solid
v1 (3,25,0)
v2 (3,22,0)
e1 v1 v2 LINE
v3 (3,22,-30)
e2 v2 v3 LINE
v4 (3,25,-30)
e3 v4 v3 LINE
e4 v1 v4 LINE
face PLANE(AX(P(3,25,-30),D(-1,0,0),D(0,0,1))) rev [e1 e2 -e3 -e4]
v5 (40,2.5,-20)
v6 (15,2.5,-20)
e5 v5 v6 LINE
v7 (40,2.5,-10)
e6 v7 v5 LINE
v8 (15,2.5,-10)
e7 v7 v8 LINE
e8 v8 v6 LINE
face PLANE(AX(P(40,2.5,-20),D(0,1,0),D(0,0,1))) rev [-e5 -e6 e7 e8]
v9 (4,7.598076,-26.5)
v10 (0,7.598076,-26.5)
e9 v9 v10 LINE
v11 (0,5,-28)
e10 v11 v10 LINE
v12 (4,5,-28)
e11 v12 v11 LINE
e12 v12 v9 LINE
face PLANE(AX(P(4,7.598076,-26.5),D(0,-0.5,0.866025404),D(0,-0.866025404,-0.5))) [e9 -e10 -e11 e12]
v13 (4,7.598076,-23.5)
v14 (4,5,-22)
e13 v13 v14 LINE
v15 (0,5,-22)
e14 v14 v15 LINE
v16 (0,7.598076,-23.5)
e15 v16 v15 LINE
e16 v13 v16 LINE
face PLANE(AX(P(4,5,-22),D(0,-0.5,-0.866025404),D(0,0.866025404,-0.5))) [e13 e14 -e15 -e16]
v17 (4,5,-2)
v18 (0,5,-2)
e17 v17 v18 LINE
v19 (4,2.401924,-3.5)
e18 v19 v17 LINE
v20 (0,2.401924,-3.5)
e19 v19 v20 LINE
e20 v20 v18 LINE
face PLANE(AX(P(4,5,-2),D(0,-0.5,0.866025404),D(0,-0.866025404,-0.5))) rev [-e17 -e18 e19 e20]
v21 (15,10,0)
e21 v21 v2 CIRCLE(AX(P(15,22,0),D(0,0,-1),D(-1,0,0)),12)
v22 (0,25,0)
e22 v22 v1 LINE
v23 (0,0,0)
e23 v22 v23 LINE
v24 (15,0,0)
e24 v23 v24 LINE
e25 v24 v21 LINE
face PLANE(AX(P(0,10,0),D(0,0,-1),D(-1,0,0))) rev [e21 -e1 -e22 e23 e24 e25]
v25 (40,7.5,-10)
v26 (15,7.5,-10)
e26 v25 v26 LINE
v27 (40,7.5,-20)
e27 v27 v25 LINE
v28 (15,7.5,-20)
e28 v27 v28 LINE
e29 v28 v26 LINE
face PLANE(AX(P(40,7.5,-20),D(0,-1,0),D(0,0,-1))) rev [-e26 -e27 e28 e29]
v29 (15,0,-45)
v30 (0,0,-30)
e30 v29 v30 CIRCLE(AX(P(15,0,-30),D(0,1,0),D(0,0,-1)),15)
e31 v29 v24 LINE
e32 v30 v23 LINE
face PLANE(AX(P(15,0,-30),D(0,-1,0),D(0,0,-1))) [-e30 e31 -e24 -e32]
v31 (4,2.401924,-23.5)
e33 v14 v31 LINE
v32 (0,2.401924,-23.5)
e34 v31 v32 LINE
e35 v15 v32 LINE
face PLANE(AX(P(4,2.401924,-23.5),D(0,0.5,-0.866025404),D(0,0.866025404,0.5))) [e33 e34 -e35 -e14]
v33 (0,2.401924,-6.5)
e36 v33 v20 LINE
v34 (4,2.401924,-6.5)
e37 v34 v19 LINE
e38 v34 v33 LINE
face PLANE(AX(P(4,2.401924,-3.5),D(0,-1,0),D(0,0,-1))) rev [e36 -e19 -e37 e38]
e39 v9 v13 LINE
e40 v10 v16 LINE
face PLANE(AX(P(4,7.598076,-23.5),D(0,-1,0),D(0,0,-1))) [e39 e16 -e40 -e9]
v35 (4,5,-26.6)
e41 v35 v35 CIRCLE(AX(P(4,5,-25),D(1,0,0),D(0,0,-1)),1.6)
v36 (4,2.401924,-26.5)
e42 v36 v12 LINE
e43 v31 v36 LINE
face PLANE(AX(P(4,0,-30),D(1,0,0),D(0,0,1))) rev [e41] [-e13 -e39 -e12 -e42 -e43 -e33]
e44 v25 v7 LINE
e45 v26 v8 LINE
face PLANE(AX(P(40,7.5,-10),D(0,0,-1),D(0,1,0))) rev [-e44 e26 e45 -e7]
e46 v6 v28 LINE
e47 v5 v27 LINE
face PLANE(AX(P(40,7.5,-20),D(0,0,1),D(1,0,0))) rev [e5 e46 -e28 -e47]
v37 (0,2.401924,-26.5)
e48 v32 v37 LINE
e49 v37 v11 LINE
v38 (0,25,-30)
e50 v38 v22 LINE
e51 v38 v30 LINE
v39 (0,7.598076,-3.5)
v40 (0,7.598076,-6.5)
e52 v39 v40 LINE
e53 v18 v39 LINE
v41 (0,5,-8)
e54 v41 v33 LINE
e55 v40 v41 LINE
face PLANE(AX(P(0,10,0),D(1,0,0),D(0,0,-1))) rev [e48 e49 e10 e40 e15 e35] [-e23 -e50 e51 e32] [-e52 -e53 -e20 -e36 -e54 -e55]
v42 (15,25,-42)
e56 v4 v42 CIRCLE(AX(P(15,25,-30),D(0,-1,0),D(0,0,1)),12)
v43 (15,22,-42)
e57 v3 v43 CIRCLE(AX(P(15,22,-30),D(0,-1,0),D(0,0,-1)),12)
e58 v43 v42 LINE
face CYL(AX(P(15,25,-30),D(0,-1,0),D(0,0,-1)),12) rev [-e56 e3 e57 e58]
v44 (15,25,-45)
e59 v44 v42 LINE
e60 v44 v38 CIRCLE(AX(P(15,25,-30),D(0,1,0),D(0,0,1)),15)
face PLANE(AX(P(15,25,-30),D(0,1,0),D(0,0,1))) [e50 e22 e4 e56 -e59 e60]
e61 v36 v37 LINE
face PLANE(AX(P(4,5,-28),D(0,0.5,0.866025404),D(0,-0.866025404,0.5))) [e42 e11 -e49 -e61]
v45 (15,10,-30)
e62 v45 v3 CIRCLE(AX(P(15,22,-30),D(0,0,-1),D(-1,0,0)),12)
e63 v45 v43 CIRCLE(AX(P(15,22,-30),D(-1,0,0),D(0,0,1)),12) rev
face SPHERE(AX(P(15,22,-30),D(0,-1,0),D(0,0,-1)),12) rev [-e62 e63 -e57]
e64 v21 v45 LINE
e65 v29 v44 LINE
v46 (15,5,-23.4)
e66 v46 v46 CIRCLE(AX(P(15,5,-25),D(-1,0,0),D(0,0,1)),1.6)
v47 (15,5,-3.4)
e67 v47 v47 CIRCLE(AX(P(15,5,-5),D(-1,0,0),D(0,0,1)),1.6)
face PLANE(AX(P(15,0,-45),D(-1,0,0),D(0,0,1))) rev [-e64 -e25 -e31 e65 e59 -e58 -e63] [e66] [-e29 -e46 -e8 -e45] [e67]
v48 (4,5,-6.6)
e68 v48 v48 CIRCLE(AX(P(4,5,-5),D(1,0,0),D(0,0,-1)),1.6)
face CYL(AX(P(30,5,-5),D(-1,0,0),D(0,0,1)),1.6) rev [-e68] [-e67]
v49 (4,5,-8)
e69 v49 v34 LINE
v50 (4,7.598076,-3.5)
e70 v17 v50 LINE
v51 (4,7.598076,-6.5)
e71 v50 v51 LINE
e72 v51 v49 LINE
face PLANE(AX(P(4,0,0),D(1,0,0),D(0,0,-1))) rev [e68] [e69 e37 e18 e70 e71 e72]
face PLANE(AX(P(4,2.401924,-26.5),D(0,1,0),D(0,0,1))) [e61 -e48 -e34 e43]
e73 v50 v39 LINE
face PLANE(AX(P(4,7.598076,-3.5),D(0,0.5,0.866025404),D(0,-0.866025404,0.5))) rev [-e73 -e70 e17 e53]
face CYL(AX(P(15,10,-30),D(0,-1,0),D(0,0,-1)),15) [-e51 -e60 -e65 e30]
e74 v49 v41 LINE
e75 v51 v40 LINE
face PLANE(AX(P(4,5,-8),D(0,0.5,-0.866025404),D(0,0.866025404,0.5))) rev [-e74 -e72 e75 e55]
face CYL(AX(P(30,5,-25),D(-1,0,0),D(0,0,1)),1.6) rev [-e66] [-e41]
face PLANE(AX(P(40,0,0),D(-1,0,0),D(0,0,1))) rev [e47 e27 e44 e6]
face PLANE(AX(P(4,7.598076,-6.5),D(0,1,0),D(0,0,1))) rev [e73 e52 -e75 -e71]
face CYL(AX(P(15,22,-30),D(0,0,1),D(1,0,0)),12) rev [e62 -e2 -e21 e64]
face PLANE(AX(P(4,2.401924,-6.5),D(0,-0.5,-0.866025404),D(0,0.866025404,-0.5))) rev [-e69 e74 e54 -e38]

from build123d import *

# Parameters (mm, degrees)
BOSS_EXTRUDE1_DEPTH = 10
BOSS_EXTRUDE2_DEPTH = 15
SKETCH8_R           = 1.6
CUT_EXTRUDE5_DEPTH  = 60.581876439
FILLET1_R           = 12
SKETCH4_W           = 15
SKETCH4_H           = 45
CUT_EXTRUDE2_DEPTH  = 60.581876439
SKETCH6_W           = 10
SKETCH6_H           = 5
BOSS_EXTRUDE3_DEPTH = 25
CUT_EXTRUDE6_DEPTH  = 4


with BuildPart() as part:
    # Sketch1 → Boss-Extrude1 (new body)
    with BuildSketch(Plane(origin=(0, 0, 0), x_dir=(1, 0, 0), z_dir=(0, 1, 0))):
        with BuildLine():
            Line((0, 0), (30, 0))
            Line((30, 0), (30, 30))
            ThreePointArc((30, 30), (15, 45), (0, 30))
            Line((0, 30), (0, 0))
        make_face()
    extrude(amount=BOSS_EXTRUDE1_DEPTH)

    # Sketch2 → Boss-Extrude2 (add)
    with BuildSketch(Plane(origin=(0, 10, 0), x_dir=(1, 0, 0), z_dir=(0, 1, 0))):
        with BuildLine():
            Line((3, 30), (3, 3))
            Line((3, 3), (3, 0))
            Line((3, 0), (0, 0))
            Line((0, 0), (0, 30))
            ThreePointArc((0, 30), (15, 45), (30, 30))
            Line((30, 30), (30, 0))
            Line((30, 0), (27, 0))
            Line((27, 0), (27, 3))
            Line((27, 3), (27, 30))
            ThreePointArc((27, 30), (15, 42), (3, 30))
        make_face()
    extrude(amount=BOSS_EXTRUDE2_DEPTH)

    # Sketch8 → Cut-Extrude5 (cut, through all)
    with BuildSketch(Plane(origin=(0, 0, 0), x_dir=(0, 0, -1), z_dir=(1, 0, 0))):
        with Locations((5, 5)):
            Circle(SKETCH8_R)
        with Locations((25, 5)):
            Circle(SKETCH8_R)
    extrude(amount=CUT_EXTRUDE5_DEPTH, mode=Mode.SUBTRACT)

    # Fillet1
    fillet1_edges = [part.edges().sort_by_distance(p)[0] for p in [
        (3, 10, -15),
        (27, 10, -15),
        (15, 10, -42),
    ]]
    fillet(fillet1_edges, radius=FILLET1_R - 0.0001)  # a hair under: the kernel refuses the full size

    # Sketch4 → Cut-Extrude2 (cut, through all)
    with BuildSketch(Plane(origin=(0, 25, 0), x_dir=(1, 0, 0), z_dir=(0, 1, 0))):
        with Locations((22.5, 22.5)):
            Rectangle(SKETCH4_W, SKETCH4_H)
    extrude(amount=-CUT_EXTRUDE2_DEPTH, mode=Mode.SUBTRACT)

    # Sketch6 → Boss-Extrude3 (add)
    with BuildSketch(Plane(origin=(15, 0, 0), x_dir=(0, 0, -1), z_dir=(1, 0, 0))):
        with Locations((15, 5)):
            Rectangle(SKETCH6_W, SKETCH6_H)
    extrude(amount=BOSS_EXTRUDE3_DEPTH)

    # Sketch9 → Cut-Extrude6 (cut)
    with BuildSketch(Plane.ZY):
        Polygon((-8, 5), (-6.5, 7.598076211), (-3.5, 7.598076211), (-2, 5), (-3.5, 2.401923789), (-6.5, 2.401923789), align=None)
    cut_extrude6 = extrude(amount=-CUT_EXTRUDE6_DEPTH, mode=Mode.SUBTRACT)

    # Mirror2: Cut-Extrude6 across plane
    add(cut_extrude6.mirror(Plane.XY.offset(-15)), mode=Mode.SUBTRACT)


solid = part.part
